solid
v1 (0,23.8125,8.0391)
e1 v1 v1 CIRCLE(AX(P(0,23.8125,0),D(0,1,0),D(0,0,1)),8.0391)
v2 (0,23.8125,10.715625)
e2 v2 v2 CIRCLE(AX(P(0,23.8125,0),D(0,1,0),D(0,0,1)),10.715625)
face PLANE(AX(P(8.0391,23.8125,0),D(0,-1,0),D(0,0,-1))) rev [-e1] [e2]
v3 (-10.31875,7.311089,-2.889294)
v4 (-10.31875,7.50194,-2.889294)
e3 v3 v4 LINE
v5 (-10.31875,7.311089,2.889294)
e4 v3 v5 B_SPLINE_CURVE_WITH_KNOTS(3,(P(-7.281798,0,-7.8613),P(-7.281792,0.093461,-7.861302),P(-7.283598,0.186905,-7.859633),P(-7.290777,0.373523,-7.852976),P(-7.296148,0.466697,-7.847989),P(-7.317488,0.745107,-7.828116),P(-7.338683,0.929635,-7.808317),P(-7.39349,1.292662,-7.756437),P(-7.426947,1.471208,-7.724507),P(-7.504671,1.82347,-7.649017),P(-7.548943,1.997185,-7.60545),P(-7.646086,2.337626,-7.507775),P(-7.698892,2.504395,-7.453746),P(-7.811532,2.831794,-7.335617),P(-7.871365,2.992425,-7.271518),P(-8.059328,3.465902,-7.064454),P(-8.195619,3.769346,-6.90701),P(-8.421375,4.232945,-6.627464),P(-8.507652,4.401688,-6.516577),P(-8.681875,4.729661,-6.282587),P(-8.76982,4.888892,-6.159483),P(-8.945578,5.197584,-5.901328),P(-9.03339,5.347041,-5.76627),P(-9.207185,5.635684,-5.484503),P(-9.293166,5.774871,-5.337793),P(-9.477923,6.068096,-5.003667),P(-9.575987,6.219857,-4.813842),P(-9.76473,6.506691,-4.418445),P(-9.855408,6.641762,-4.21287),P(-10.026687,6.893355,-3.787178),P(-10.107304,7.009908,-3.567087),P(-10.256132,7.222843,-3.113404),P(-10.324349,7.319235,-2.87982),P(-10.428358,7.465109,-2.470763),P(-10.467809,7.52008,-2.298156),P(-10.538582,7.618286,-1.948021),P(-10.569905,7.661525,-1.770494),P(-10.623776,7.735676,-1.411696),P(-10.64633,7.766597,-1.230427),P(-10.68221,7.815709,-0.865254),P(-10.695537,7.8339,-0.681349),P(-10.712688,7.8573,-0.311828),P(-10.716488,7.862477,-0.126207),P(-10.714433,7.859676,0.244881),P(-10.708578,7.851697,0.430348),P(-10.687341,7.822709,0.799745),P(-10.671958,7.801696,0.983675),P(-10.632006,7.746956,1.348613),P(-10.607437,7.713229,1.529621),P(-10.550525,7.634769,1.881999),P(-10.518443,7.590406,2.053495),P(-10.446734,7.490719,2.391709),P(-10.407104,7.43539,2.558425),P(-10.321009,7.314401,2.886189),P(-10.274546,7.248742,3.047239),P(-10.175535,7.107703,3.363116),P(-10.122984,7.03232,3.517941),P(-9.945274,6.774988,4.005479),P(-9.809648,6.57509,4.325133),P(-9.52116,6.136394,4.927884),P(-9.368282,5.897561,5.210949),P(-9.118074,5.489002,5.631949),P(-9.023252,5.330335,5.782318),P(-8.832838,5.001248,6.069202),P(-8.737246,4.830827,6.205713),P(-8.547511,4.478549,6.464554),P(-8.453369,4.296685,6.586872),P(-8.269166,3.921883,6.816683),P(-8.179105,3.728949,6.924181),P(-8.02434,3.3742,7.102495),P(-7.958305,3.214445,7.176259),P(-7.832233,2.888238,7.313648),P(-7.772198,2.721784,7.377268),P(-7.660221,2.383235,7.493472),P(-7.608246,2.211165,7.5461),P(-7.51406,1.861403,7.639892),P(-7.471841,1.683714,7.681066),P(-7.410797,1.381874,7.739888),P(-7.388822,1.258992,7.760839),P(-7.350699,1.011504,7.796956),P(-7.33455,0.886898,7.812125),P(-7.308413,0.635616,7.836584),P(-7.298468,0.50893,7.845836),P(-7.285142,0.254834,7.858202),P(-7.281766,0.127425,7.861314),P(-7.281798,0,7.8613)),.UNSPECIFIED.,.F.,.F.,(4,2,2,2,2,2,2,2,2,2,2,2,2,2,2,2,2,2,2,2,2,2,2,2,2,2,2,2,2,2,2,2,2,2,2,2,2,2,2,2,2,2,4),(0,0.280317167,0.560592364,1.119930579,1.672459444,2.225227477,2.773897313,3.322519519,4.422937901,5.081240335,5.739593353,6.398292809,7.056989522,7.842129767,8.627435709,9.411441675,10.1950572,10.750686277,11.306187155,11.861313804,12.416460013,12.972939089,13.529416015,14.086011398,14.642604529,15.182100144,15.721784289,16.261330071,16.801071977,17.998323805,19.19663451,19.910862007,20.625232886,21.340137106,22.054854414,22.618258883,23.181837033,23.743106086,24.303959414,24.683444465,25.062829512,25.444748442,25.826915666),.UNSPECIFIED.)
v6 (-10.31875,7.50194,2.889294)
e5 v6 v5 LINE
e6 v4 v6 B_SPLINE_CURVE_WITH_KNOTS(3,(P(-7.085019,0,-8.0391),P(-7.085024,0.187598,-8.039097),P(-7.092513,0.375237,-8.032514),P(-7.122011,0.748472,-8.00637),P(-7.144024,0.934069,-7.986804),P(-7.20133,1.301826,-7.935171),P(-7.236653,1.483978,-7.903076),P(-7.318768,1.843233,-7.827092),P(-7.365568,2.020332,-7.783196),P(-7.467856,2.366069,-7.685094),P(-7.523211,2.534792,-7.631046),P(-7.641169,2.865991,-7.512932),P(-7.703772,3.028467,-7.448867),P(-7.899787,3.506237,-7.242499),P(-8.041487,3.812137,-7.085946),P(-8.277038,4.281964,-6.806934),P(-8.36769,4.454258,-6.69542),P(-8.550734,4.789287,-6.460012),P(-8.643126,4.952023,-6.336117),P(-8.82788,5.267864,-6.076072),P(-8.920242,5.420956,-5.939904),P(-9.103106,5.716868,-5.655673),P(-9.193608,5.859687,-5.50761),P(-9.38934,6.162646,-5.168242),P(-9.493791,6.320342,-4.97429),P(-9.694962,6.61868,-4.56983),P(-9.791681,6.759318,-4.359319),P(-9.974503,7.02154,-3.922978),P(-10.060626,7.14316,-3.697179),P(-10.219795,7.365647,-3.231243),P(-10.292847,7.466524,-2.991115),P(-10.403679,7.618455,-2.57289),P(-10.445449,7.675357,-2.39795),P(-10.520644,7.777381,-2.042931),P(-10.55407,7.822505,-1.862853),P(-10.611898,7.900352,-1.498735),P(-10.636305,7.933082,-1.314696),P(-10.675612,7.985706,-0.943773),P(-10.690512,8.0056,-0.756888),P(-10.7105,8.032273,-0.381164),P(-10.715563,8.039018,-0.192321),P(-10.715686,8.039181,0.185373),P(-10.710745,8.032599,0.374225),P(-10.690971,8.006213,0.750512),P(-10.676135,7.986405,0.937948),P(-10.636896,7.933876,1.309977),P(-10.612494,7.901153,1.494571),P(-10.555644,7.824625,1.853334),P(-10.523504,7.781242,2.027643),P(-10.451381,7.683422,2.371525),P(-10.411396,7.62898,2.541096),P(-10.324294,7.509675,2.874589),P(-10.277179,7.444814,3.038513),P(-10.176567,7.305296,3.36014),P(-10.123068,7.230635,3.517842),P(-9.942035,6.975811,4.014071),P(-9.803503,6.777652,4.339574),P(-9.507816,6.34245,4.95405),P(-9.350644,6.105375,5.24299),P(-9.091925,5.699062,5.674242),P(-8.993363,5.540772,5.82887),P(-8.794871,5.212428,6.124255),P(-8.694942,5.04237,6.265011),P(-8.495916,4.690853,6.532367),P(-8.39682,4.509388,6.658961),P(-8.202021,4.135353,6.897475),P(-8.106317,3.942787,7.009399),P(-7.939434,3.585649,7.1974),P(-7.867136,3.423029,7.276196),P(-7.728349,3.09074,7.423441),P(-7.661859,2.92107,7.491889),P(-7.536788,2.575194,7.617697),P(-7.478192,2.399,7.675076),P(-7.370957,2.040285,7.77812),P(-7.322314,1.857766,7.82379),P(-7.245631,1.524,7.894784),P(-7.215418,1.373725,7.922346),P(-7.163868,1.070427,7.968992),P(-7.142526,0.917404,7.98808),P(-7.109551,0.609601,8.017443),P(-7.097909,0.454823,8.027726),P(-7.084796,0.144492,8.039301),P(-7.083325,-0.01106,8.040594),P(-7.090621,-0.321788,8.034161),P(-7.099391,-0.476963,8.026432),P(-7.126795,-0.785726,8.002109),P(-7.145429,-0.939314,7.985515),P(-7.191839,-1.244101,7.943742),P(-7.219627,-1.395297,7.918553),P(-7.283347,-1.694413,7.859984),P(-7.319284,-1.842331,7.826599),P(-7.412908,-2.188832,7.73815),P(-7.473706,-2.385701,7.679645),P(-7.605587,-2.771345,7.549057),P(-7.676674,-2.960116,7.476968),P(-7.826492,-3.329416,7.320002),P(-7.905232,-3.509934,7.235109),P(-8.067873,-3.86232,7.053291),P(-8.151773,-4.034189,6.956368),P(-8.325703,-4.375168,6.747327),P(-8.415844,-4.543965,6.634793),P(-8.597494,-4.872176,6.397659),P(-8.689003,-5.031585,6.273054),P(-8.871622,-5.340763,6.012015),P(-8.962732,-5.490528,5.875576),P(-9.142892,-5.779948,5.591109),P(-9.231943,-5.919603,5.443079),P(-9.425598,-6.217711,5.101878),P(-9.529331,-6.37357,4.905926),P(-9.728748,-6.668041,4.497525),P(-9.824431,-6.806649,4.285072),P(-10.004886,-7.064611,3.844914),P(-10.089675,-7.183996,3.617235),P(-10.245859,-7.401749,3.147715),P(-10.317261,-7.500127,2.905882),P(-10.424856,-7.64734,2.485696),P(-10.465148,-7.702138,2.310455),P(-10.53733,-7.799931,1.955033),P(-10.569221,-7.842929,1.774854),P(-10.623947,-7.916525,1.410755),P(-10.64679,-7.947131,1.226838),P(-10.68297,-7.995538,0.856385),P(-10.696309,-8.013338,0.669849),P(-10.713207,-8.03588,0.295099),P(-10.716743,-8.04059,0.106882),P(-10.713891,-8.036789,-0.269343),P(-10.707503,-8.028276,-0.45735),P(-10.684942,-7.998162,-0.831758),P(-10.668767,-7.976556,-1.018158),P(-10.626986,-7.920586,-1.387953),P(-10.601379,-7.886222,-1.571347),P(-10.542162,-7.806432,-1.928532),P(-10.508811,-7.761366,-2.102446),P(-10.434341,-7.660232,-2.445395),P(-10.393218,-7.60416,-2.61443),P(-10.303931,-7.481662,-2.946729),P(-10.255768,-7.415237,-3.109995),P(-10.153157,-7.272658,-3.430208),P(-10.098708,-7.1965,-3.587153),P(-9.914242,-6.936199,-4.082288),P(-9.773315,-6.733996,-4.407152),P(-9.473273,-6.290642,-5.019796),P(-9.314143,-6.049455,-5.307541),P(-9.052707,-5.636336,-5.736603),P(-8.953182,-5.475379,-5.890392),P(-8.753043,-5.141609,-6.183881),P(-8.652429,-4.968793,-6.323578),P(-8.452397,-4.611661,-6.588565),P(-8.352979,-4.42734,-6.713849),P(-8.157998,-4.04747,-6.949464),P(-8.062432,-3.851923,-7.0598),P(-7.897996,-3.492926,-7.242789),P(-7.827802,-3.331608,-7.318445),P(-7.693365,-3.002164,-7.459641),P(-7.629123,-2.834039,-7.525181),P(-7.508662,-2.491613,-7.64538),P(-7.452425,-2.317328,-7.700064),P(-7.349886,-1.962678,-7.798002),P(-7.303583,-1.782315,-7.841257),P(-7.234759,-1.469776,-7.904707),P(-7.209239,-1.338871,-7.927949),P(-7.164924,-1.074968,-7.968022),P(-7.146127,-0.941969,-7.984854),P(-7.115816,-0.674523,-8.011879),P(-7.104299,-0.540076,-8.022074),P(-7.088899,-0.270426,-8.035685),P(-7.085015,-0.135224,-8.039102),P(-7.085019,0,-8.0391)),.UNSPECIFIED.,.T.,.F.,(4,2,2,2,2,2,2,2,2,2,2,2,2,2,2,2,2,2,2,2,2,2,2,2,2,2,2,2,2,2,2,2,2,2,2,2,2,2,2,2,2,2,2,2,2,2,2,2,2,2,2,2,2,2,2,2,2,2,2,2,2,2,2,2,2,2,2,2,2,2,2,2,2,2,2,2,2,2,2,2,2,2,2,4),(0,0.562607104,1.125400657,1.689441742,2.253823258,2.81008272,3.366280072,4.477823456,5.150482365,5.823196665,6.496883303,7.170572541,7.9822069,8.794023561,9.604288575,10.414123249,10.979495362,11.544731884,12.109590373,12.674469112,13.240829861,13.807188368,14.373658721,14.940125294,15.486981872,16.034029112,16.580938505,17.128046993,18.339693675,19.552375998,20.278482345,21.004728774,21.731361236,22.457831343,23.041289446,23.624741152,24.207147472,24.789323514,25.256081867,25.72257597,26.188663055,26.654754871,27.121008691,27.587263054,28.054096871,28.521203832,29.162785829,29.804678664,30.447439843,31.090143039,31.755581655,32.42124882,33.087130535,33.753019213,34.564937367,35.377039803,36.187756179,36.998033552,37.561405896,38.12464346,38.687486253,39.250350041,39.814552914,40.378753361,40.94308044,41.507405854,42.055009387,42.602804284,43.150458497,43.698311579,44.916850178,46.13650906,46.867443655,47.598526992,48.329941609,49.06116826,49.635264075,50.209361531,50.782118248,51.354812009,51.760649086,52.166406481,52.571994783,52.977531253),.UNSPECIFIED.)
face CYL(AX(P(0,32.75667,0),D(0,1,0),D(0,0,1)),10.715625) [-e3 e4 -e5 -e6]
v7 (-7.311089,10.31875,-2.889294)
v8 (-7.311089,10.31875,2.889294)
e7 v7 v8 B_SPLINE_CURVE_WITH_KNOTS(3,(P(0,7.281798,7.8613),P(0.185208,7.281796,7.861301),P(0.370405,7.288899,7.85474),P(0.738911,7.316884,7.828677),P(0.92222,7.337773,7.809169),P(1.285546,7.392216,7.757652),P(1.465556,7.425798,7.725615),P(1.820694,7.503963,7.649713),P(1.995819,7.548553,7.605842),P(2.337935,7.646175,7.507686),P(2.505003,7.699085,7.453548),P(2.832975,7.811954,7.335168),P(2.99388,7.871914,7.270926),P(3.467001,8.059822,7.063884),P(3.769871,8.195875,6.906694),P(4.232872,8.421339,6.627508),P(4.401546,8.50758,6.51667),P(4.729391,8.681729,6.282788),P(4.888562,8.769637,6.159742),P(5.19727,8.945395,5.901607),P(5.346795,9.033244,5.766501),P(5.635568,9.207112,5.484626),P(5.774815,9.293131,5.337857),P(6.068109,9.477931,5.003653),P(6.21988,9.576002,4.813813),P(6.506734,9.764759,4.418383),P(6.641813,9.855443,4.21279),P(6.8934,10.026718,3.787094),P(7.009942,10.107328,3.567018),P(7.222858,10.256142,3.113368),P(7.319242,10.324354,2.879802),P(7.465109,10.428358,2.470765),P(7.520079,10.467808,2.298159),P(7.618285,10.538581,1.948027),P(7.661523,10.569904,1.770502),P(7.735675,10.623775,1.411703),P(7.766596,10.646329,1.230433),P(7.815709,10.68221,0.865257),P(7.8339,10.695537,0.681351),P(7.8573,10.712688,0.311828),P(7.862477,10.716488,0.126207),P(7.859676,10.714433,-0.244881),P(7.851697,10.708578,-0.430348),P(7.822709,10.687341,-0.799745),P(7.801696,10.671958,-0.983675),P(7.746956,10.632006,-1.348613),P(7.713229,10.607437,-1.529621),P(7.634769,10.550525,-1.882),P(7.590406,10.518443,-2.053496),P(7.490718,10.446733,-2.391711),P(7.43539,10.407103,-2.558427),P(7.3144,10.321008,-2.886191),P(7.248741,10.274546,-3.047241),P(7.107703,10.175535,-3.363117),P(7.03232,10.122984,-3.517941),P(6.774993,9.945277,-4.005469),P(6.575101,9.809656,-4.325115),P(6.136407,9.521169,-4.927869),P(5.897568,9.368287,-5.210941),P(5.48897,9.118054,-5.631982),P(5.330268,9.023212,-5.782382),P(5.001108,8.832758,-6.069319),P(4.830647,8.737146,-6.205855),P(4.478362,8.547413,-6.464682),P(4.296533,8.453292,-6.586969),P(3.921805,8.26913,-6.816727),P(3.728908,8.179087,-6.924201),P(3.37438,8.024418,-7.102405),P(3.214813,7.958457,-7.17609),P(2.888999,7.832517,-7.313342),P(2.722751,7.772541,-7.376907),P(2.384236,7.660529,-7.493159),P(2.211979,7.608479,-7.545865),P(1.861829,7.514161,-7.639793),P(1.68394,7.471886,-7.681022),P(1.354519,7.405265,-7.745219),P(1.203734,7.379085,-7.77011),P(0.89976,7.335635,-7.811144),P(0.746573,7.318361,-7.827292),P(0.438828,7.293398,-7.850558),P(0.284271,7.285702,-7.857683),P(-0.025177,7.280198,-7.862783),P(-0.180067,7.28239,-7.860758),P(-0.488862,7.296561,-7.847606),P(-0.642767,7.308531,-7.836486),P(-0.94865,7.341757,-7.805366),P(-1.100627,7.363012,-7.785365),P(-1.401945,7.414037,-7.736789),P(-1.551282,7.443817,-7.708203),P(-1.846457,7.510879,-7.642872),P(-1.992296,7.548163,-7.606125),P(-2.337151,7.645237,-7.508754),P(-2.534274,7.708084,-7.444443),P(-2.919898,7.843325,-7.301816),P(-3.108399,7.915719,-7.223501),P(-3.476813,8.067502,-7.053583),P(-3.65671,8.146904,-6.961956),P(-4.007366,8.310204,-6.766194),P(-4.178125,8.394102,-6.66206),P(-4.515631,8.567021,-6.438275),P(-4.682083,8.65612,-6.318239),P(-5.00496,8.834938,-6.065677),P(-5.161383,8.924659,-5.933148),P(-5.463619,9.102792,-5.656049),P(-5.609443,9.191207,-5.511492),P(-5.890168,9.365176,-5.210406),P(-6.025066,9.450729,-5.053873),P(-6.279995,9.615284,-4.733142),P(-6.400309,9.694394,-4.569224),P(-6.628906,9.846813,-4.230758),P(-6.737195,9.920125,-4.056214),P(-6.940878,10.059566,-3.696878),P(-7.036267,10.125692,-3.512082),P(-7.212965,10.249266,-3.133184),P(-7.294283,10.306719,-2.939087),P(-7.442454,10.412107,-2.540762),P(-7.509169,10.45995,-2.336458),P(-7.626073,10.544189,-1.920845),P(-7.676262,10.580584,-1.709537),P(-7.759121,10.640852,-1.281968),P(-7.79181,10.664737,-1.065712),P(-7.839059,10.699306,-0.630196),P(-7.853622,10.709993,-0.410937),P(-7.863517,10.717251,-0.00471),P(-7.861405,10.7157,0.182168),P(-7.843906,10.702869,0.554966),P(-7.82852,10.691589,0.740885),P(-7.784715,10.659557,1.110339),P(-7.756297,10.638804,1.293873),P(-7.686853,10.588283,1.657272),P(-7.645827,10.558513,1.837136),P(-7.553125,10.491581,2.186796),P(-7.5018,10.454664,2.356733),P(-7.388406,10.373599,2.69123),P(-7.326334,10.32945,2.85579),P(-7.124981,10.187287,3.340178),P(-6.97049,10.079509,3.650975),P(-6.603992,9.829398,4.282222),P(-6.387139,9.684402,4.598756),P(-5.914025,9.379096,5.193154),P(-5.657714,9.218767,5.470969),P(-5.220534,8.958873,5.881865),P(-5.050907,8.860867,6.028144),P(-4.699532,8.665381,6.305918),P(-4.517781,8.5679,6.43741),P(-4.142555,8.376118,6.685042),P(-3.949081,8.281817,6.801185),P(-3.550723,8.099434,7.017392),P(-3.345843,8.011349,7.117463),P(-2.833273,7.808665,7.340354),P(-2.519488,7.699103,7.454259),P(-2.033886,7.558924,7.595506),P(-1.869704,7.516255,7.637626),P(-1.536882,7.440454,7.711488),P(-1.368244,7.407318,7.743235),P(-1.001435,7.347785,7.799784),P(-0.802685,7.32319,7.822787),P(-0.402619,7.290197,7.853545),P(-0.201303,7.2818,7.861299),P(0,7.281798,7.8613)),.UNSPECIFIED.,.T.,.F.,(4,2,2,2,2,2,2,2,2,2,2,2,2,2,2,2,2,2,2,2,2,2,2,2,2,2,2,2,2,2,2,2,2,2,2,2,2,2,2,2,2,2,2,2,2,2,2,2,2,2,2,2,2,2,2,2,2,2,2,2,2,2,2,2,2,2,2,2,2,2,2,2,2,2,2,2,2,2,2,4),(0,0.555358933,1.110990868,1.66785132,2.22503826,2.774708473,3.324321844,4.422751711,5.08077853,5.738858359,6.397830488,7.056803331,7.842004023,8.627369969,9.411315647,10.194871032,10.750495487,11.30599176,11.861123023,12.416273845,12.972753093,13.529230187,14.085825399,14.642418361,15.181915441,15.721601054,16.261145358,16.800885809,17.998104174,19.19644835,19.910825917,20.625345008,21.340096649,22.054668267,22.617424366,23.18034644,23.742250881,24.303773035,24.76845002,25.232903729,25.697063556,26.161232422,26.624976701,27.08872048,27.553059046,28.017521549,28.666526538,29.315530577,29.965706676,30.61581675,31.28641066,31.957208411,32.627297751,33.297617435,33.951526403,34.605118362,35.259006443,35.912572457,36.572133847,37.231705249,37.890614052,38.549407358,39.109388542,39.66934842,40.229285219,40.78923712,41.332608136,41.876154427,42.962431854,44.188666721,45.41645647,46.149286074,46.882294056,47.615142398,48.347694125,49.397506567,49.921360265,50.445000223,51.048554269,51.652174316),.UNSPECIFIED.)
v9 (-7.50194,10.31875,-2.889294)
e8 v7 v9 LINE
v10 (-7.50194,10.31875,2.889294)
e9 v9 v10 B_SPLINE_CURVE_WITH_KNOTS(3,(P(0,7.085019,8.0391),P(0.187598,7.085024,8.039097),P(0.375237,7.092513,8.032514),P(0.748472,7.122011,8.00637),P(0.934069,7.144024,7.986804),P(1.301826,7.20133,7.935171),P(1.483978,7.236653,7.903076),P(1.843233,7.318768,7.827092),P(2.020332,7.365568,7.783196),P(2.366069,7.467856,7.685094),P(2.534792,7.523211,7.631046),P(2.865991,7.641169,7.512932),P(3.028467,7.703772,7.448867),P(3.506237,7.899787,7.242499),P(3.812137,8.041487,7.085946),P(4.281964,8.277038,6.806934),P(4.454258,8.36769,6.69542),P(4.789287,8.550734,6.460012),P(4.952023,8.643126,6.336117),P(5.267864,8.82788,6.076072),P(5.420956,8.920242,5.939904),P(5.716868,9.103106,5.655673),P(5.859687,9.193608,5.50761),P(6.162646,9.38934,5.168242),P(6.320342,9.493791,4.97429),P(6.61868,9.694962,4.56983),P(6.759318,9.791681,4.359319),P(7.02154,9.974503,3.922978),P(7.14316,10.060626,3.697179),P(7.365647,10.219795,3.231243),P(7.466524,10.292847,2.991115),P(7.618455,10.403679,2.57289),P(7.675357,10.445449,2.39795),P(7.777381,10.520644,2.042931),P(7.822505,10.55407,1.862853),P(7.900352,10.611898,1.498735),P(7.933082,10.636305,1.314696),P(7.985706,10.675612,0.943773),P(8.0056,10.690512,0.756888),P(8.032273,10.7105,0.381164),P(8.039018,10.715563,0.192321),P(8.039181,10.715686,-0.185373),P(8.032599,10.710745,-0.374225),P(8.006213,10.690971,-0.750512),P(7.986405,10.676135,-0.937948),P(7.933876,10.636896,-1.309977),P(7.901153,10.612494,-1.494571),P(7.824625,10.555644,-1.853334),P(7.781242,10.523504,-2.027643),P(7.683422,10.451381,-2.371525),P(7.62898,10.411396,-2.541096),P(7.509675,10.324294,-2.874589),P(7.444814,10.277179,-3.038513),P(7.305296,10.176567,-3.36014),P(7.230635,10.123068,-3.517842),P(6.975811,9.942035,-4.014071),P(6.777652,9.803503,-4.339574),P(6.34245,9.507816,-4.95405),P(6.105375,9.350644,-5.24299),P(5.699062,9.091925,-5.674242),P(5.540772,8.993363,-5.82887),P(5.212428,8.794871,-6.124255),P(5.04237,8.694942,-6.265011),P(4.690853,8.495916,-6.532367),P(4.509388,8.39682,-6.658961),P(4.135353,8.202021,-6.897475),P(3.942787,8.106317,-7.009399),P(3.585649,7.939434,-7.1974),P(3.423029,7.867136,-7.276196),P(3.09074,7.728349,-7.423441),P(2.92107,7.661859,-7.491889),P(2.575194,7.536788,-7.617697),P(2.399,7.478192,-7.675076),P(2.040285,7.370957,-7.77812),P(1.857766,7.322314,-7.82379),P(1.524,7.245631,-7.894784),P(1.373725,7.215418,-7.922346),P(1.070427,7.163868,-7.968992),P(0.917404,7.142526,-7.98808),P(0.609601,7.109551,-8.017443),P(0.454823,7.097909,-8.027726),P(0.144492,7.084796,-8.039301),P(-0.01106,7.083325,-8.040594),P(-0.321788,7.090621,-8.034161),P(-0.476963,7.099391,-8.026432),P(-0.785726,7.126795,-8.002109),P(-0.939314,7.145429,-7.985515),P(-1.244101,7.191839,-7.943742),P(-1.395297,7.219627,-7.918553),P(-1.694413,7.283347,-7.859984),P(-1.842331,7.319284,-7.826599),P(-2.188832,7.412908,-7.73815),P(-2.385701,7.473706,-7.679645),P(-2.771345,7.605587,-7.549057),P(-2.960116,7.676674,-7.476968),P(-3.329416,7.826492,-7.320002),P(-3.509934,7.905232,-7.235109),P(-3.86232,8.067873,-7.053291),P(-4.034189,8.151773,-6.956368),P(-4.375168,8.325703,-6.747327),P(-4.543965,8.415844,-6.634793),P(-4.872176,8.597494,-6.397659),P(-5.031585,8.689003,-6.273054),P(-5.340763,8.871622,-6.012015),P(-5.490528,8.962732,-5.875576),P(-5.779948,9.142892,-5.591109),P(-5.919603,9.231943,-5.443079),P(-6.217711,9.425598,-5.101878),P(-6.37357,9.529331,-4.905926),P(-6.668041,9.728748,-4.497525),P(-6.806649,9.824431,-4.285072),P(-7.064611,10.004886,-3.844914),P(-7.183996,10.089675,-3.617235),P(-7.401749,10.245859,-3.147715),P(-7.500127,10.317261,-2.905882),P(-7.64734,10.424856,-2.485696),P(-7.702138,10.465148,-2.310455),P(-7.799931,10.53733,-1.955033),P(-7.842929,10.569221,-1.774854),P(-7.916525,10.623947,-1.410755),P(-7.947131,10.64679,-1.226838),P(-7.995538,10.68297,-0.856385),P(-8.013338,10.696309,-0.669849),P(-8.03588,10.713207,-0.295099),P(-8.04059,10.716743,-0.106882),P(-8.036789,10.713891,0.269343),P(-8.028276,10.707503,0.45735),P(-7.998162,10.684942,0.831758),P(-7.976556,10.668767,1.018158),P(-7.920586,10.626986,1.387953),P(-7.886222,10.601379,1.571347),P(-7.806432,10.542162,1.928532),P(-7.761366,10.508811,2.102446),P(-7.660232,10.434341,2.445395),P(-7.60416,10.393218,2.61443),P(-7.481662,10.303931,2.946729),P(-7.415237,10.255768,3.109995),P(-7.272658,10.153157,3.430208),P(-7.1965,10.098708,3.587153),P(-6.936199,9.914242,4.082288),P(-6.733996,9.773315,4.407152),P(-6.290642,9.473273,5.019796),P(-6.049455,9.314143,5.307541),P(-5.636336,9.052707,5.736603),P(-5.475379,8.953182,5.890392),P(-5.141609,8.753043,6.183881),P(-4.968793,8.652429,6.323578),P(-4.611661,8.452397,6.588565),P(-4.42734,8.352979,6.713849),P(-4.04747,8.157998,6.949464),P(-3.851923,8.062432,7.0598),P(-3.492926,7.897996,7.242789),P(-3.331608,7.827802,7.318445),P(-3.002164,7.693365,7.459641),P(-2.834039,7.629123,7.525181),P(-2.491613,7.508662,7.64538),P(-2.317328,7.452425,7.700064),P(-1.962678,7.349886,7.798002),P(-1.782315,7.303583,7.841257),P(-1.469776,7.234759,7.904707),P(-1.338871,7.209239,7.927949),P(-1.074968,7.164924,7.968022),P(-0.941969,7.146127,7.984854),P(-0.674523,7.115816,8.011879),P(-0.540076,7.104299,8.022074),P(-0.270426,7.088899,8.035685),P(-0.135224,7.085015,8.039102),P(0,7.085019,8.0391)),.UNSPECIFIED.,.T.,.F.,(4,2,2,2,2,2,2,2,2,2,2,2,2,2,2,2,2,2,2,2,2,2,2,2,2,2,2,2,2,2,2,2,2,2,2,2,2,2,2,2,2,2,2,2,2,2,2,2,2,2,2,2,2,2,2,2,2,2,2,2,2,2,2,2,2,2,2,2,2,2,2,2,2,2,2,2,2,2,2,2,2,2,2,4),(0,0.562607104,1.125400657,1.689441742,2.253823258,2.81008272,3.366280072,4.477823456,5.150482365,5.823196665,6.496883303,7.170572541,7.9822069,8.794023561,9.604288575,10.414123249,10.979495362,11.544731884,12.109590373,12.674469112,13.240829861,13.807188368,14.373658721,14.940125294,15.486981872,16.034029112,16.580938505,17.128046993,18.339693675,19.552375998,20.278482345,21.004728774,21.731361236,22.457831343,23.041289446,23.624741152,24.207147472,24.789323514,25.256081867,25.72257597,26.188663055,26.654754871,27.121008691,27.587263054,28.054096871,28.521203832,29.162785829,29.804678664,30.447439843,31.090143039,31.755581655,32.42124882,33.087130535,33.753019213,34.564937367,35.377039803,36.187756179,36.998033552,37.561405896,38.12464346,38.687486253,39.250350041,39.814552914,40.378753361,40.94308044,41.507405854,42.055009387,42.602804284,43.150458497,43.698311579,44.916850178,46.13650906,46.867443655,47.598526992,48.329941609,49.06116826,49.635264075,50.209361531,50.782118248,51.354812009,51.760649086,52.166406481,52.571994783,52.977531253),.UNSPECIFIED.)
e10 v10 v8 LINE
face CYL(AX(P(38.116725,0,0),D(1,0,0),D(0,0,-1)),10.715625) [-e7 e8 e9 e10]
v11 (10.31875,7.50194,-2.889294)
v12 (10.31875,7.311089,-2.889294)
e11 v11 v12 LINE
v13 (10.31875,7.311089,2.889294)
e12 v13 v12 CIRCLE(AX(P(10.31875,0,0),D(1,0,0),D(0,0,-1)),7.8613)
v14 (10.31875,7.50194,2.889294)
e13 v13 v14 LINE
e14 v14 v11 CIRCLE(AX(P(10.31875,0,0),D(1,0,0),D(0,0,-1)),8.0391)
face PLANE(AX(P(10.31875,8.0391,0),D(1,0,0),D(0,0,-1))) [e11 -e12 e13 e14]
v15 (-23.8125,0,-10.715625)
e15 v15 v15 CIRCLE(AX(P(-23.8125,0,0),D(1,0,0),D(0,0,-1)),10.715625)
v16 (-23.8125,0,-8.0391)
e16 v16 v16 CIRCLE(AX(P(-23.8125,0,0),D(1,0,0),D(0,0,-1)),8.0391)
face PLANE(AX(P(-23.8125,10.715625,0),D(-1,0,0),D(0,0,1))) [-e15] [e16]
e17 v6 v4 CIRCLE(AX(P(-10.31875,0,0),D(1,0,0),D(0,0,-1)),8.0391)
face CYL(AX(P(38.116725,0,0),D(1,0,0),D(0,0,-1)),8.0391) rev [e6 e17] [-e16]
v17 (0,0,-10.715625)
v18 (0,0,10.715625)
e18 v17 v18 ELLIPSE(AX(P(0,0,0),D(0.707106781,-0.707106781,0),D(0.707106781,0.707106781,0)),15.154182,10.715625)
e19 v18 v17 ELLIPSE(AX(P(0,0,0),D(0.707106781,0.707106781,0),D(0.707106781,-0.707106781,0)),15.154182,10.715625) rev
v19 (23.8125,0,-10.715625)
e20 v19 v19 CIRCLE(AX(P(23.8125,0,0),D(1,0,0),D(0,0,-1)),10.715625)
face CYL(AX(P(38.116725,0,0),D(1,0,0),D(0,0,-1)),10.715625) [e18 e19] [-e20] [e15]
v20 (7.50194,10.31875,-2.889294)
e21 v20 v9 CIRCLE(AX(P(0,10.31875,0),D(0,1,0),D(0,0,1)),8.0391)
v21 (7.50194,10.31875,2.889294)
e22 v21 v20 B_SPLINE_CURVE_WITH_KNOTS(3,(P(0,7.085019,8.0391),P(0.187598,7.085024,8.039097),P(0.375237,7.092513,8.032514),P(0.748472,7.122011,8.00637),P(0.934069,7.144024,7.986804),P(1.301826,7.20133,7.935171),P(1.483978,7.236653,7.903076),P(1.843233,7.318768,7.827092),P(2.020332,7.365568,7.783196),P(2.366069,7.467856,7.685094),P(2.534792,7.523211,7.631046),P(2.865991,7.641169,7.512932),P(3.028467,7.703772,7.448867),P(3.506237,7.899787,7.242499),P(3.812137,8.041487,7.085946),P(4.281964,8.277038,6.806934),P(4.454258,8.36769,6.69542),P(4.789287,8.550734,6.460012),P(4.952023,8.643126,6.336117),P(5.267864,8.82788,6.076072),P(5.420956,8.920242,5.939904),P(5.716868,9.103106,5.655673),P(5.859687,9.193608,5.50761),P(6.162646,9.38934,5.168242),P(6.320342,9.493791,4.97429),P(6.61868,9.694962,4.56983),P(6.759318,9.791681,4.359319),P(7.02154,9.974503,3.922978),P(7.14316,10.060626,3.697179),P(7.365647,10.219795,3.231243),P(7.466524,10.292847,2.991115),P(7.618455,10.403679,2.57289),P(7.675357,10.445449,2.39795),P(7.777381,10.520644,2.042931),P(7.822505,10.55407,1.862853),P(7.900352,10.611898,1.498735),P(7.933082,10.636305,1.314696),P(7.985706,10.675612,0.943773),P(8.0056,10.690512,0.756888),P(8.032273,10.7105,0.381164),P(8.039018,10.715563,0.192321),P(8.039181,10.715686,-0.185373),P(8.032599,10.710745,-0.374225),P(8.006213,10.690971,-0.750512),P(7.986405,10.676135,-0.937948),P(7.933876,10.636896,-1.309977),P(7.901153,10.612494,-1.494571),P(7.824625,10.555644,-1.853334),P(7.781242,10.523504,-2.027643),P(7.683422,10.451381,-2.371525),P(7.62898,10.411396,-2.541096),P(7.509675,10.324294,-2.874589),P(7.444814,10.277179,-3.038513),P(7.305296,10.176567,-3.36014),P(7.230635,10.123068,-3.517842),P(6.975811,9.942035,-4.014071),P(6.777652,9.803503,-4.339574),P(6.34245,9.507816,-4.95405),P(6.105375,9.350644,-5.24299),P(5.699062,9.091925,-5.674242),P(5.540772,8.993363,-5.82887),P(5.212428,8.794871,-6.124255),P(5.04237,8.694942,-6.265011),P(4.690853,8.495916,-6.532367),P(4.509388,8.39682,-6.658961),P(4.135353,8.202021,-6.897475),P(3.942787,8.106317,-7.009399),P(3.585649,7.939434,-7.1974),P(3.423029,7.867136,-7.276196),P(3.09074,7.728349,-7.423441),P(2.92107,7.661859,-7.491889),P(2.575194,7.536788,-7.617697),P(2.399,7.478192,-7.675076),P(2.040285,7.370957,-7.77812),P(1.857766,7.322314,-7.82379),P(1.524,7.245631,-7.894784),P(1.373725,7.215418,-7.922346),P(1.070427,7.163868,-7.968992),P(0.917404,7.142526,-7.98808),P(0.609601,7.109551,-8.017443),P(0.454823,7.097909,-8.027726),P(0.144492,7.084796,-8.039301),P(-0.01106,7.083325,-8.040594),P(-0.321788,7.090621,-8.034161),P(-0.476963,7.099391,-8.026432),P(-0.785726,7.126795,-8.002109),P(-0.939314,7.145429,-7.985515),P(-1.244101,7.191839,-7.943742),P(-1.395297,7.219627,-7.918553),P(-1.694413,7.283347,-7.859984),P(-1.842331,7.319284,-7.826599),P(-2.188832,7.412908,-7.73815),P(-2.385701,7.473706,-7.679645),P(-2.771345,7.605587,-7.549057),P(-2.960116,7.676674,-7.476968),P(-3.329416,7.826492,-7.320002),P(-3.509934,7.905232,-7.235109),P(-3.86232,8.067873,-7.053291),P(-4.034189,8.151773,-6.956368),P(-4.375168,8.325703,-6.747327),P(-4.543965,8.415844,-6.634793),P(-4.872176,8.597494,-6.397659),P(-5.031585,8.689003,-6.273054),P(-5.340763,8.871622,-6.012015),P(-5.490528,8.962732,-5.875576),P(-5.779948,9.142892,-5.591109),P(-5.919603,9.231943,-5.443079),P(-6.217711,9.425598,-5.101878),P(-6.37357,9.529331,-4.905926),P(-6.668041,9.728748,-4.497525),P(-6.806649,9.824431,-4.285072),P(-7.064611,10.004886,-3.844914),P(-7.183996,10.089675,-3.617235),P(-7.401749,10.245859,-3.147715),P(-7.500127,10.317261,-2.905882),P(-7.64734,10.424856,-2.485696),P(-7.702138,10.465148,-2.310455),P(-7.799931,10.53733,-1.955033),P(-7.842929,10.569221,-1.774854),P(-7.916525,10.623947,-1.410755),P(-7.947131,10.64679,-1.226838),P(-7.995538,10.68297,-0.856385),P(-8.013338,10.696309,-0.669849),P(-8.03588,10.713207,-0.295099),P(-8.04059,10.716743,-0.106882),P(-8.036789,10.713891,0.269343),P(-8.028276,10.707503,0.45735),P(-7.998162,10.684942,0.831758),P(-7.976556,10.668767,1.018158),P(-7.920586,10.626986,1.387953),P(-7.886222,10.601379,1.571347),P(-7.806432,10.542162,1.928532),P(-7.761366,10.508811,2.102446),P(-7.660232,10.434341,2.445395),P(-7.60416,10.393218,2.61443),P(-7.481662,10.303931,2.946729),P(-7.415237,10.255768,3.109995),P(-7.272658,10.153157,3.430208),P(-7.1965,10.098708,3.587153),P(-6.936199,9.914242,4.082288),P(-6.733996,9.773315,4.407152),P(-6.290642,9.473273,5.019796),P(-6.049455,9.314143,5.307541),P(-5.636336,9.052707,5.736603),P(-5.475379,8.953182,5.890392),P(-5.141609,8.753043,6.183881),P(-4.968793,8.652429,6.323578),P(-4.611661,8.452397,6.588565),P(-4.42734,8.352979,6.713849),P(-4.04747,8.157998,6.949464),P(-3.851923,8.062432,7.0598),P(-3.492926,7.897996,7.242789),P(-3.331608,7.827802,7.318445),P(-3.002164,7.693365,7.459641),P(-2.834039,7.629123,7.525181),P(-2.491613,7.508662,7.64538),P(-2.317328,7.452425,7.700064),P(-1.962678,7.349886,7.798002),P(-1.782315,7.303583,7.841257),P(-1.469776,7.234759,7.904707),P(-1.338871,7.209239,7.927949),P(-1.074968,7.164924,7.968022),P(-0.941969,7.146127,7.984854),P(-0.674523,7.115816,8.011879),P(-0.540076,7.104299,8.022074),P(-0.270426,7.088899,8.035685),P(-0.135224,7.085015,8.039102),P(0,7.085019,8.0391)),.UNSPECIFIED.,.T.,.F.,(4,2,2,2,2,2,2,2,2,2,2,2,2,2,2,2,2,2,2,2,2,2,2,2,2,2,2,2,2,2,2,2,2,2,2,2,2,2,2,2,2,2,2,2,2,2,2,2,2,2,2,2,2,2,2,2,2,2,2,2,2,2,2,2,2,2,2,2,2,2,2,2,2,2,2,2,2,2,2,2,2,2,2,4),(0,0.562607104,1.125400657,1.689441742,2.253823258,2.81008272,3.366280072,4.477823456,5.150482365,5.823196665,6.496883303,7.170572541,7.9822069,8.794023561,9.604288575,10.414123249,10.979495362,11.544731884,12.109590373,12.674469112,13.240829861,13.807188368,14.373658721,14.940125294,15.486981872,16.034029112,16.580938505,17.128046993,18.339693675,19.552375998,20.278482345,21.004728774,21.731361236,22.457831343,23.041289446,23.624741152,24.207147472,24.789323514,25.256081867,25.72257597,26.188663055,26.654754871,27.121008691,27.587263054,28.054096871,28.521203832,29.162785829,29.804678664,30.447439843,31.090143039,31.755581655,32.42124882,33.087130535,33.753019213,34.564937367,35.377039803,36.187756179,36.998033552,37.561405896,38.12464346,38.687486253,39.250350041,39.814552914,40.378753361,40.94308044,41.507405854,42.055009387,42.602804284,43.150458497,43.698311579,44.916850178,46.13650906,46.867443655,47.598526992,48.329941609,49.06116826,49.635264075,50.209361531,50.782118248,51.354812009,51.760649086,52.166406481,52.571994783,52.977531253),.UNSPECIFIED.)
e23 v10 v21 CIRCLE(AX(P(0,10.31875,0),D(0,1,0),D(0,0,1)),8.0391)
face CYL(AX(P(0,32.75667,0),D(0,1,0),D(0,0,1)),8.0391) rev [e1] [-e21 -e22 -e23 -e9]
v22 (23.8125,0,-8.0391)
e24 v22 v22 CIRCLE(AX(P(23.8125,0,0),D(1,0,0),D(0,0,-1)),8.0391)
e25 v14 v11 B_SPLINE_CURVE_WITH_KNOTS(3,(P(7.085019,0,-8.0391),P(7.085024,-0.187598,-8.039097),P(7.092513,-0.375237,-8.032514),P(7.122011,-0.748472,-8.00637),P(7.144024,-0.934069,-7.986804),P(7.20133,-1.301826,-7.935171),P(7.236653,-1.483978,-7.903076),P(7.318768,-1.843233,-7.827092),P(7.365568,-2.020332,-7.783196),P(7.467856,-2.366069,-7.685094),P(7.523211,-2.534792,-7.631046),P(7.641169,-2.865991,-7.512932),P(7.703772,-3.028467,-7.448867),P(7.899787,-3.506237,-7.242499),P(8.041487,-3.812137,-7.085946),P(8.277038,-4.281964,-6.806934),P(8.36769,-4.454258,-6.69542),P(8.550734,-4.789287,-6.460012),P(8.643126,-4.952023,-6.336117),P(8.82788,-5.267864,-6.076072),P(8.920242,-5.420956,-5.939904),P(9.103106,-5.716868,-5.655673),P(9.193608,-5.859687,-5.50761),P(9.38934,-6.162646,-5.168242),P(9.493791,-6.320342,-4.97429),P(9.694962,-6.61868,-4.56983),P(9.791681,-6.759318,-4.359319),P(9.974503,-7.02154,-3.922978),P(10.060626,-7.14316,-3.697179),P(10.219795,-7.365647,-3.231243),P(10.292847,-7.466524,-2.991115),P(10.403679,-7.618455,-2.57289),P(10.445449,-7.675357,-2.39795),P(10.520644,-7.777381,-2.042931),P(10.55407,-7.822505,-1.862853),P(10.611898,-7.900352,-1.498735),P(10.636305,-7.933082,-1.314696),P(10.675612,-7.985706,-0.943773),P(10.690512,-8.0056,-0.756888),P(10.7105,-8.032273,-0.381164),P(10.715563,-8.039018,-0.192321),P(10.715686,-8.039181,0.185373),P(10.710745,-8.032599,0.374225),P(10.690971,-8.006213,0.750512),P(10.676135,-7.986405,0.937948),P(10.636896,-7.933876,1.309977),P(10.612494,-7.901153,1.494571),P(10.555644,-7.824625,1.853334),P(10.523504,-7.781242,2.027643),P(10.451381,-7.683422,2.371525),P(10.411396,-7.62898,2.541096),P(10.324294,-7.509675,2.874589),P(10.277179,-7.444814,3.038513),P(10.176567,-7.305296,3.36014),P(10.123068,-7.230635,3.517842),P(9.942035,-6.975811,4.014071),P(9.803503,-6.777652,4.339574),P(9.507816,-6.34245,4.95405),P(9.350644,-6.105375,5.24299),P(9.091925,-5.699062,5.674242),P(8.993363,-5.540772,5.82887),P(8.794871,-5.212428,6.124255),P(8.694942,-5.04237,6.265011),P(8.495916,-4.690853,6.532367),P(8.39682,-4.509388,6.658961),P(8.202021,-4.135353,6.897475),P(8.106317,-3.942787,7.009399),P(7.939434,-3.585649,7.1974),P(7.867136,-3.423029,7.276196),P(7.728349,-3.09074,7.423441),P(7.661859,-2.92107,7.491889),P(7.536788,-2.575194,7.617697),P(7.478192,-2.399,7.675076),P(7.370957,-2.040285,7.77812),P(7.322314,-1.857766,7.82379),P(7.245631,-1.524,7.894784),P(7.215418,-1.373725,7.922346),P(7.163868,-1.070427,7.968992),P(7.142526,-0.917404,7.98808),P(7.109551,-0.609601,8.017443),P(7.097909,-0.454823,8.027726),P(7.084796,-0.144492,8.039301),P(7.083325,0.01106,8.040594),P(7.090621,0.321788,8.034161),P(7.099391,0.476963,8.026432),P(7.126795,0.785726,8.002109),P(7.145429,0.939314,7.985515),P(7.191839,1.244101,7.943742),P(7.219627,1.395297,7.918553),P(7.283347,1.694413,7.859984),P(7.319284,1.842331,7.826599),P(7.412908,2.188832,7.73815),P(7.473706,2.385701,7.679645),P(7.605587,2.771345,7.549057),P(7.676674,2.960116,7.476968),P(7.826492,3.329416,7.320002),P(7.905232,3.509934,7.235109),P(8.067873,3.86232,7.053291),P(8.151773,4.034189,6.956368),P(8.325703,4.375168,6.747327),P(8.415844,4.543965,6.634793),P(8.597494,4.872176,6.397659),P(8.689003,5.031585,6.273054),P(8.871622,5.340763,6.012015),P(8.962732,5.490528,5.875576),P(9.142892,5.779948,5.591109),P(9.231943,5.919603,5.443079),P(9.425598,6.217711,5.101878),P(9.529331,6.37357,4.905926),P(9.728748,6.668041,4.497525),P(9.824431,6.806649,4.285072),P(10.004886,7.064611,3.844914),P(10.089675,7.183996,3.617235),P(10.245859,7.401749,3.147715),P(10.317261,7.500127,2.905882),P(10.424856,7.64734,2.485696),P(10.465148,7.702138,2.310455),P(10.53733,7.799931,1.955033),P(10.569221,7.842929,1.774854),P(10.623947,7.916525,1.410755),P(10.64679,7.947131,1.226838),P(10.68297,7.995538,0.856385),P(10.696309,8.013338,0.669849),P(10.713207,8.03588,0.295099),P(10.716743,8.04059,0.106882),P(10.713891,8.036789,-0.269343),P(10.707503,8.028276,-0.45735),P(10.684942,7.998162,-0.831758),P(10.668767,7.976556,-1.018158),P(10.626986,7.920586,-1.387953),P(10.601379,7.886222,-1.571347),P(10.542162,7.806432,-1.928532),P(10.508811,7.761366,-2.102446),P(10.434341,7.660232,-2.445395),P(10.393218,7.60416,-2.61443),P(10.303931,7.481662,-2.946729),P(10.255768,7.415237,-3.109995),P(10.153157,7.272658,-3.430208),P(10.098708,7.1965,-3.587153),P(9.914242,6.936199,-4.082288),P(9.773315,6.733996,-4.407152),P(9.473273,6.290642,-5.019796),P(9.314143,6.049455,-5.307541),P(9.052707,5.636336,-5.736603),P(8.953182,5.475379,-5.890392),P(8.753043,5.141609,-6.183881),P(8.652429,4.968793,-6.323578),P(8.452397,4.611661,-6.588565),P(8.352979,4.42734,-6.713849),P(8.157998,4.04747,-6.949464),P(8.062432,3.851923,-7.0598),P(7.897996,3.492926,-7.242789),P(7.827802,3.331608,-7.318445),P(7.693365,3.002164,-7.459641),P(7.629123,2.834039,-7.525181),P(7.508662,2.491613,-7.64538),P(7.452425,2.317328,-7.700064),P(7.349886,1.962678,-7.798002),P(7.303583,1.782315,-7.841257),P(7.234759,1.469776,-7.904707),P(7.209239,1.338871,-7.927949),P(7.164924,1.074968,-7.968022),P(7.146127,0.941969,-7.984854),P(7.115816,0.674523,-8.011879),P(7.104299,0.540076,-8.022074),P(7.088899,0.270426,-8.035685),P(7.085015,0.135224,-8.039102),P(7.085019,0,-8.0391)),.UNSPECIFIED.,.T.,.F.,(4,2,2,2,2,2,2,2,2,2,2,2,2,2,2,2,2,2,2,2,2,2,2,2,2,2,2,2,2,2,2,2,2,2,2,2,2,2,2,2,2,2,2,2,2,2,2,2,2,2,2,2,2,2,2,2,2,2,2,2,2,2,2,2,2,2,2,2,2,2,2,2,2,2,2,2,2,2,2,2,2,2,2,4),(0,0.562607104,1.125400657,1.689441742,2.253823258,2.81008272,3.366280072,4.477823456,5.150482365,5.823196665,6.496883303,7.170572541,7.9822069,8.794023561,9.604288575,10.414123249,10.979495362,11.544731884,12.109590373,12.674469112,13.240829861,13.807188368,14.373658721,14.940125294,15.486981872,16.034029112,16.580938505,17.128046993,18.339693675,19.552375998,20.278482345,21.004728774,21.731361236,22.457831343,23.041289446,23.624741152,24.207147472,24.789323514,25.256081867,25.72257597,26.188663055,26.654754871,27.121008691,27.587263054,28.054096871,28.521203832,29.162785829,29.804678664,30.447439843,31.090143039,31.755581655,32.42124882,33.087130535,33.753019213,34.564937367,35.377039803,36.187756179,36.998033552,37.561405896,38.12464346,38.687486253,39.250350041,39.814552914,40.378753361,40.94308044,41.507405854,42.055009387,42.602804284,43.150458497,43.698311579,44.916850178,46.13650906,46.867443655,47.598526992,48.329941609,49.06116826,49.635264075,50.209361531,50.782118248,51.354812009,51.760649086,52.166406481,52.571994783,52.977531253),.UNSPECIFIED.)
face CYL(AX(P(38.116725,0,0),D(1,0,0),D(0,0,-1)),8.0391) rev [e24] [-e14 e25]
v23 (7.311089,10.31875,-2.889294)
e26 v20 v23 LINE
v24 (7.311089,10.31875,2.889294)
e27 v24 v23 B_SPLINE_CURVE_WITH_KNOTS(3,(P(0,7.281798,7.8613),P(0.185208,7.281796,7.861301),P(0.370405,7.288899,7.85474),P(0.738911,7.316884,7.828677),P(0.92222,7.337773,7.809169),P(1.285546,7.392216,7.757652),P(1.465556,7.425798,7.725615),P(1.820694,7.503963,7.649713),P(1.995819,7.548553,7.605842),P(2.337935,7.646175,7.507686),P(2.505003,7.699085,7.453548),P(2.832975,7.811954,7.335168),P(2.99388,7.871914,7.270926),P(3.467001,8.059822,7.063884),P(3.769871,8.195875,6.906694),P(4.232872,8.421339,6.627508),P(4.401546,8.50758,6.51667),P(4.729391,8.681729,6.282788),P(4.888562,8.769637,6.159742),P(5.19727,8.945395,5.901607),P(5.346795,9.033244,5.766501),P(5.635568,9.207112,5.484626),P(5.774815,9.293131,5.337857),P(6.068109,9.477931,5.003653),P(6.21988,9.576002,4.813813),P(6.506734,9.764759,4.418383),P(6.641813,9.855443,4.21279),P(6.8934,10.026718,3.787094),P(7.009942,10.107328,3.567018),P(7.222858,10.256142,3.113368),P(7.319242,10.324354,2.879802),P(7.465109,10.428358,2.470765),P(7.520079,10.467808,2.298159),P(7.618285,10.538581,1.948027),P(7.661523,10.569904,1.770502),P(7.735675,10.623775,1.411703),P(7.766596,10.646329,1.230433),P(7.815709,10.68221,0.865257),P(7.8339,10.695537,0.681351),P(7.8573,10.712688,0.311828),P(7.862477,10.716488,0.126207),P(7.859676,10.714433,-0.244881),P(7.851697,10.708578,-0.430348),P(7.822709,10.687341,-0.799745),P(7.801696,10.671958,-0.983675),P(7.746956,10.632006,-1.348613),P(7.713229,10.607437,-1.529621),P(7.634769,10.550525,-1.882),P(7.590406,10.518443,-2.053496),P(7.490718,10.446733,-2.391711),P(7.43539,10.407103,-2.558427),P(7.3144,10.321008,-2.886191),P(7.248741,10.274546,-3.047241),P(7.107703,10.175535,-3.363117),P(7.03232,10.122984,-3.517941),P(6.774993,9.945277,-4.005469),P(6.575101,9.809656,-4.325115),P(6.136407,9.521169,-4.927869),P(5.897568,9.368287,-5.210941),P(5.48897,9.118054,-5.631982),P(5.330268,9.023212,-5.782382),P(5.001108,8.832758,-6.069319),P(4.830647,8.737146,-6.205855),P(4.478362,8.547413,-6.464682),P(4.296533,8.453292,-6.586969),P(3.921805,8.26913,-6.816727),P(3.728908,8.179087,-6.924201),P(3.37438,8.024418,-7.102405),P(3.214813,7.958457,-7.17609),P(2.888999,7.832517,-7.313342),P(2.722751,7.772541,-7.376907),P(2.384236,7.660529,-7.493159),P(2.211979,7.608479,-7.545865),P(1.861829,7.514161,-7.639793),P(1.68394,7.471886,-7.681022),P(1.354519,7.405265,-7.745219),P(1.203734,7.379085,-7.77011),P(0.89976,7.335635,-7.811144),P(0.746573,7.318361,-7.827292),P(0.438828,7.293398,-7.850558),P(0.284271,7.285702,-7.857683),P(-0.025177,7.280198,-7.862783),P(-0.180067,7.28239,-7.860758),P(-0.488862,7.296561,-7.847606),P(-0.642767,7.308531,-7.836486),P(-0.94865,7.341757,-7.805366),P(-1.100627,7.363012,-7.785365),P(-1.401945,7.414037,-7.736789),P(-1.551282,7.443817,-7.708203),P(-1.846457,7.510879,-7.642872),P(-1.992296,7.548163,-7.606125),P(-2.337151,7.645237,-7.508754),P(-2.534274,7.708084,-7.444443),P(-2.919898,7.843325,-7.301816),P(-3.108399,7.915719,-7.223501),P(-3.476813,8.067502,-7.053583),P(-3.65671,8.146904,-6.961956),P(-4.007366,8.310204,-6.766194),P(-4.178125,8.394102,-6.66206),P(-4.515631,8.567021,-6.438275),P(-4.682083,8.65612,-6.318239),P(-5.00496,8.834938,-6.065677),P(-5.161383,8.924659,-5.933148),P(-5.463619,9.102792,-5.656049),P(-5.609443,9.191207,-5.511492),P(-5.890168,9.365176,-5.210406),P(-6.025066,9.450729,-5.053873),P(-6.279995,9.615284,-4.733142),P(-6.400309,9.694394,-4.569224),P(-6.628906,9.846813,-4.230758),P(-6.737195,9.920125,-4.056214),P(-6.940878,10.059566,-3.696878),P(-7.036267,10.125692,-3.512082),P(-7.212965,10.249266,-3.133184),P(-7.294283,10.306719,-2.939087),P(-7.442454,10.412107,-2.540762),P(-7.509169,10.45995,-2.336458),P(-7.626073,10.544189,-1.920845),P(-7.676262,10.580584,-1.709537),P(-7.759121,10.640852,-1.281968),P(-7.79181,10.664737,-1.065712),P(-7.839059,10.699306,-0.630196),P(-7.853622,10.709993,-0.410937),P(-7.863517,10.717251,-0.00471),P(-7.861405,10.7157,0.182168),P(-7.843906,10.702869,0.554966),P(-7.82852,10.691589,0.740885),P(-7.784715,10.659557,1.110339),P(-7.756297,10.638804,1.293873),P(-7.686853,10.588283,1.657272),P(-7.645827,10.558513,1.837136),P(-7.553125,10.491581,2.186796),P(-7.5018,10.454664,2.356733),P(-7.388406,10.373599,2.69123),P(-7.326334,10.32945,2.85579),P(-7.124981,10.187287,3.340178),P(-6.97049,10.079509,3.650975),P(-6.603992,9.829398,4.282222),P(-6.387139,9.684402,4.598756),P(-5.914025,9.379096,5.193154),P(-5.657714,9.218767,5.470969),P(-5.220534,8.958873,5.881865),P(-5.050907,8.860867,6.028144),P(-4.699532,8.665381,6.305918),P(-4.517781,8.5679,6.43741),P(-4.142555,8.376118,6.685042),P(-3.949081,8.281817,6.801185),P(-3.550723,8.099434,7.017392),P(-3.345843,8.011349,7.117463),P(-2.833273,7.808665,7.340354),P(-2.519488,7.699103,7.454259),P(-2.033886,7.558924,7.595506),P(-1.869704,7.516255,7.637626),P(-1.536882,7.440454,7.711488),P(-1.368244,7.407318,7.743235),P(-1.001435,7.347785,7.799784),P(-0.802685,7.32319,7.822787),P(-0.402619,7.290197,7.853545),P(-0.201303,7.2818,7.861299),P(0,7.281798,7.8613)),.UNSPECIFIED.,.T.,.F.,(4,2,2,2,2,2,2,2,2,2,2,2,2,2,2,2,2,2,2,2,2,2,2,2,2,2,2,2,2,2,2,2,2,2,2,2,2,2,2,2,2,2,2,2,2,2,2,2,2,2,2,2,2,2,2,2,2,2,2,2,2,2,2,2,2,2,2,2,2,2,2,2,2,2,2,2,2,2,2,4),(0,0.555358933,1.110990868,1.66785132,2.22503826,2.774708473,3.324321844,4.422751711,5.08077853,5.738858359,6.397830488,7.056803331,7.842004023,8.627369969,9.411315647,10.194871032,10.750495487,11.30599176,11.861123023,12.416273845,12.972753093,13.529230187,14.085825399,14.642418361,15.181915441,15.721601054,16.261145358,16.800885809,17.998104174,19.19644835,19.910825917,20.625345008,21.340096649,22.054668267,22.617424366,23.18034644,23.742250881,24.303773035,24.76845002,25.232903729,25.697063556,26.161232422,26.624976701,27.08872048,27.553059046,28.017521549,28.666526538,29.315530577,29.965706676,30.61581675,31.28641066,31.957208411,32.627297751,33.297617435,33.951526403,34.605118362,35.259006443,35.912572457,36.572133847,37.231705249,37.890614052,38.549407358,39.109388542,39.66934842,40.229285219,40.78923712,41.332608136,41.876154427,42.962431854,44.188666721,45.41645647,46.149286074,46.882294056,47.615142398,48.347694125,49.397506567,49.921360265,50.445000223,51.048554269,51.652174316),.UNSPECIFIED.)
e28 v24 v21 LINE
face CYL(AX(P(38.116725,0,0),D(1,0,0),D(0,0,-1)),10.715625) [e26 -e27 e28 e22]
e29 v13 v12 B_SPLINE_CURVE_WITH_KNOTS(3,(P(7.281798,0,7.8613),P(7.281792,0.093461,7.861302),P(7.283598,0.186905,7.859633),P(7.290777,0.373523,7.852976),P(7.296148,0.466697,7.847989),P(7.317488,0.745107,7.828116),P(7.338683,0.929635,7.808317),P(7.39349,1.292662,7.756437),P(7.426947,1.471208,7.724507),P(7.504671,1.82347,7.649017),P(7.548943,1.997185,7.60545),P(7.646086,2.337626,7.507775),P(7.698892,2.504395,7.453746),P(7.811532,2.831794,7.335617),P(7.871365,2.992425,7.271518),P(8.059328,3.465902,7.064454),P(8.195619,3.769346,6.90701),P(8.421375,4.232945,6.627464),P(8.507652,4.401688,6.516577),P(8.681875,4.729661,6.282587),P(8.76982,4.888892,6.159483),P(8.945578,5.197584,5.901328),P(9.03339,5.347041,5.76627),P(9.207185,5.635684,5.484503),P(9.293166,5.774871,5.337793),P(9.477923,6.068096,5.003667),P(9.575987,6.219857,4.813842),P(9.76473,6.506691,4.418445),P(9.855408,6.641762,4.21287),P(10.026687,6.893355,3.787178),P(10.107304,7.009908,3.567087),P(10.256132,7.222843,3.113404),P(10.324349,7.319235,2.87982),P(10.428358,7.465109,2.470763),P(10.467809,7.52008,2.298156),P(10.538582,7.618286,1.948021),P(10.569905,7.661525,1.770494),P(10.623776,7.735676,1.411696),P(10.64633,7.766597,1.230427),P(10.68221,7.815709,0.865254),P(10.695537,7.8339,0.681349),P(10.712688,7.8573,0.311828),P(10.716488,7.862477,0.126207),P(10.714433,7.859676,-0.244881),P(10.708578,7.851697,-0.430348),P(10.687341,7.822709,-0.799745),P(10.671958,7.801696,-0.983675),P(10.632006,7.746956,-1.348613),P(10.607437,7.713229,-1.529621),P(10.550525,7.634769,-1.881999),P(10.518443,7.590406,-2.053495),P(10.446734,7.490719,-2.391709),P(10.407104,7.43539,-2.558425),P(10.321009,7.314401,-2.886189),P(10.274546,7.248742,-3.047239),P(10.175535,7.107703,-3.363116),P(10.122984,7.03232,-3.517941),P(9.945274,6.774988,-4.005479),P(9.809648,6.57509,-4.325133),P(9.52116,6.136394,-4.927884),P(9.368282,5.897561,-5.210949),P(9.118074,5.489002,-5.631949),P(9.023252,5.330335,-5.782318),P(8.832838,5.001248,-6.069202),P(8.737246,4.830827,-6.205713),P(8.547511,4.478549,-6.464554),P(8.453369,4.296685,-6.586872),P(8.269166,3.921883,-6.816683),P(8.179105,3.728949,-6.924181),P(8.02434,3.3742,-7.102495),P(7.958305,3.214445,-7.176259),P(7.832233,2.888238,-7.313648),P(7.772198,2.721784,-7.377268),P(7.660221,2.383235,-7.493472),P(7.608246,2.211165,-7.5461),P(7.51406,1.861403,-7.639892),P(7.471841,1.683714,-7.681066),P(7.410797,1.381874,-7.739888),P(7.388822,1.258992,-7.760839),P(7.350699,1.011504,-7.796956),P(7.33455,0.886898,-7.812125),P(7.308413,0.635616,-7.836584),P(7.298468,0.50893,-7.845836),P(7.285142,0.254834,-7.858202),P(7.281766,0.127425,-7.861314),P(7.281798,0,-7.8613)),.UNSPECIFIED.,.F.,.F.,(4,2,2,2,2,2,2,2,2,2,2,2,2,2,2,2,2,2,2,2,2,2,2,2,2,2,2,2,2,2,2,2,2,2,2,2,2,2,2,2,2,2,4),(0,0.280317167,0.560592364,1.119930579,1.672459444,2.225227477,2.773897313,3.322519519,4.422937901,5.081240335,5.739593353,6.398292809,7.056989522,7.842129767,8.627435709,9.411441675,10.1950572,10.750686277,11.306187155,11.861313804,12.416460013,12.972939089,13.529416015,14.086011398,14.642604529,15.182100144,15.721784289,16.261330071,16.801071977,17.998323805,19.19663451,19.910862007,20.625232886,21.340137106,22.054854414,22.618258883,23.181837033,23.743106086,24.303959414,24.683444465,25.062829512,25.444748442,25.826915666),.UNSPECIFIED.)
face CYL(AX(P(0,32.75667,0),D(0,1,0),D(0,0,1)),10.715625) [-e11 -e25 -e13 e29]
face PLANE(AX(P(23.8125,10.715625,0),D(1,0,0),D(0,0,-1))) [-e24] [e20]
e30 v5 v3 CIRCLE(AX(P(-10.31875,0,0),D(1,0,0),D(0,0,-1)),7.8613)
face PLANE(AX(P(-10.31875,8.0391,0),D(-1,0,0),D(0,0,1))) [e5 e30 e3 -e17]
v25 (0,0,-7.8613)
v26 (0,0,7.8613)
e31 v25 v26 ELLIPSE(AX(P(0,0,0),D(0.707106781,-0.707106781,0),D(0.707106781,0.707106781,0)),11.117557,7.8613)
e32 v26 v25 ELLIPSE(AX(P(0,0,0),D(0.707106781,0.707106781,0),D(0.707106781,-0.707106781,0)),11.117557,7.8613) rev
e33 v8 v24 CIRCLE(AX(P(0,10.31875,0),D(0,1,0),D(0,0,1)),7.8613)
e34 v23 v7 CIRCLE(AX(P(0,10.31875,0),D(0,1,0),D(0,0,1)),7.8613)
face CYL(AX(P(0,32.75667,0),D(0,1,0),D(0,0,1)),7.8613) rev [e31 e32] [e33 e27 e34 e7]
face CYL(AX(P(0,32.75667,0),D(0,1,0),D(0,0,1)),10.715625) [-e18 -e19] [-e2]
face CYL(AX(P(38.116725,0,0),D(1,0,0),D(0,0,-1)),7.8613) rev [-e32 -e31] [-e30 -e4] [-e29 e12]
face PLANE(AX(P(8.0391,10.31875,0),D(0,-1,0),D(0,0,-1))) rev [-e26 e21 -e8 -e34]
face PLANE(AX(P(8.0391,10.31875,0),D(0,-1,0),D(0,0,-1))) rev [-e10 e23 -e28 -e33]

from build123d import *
from build123d.topology import SkipClean

# Parameters (mm, degrees)
SKETCH4_R              = 7.8613
CUT_EXTRUDE1_DEPTH     = 50.165
CUT_EXTRUDE2_OUTLINE_W = 7.8613
CUT_EXTRUDE2_OUTLINE_H = 10.71591219


# Read off the part's stored shape, not the designer's step: Cut-Extrude2
with BuildPart() as part:
    # Sketch1 → Revolve1 (revolve)
    with BuildSketch(Plane.XY, mode=Mode.PRIVATE) as revolve1_sk:
        Polygon((-23.8125, 10.715625), (23.8125, 10.715625), (23.8125, 8.0391), (10.31875, 8.0391), (10.31875, 7.8613), (-10.31875, 7.8613), (-10.31875, 8.0391), (-23.8125, 8.0391), align=None)
    revolve(revolve1_sk.sketch.rotate(Axis((38.116724739, 0, 0), (-1, 0, 0)), 90), axis=Axis((38.116724739, 0, 0), (-1, 0, 0)))

    # Sketch3 → Revolve2 (revolve)
    with BuildSketch(Plane.XY, mode=Mode.PRIVATE) as revolve2_sk:
        Polygon((8.0391, 23.8125), (10.715625, 23.8125), (10.715625, 0), (7.8613, 0), (7.8613, 10.31875), (8.0391, 10.31875), align=None)
    revolve(revolve2_sk.sketch.rotate(Axis((0, 32.756669959, 0), (0, -1, 0)), 90), axis=Axis((0, 32.756669959, 0), (0, -1, 0)))

    # Sketch4 → Cut-Extrude1 (cut)
    with BuildSketch(Plane.ZY.offset(26.3525)):
        with Locations(Location((0, 0, 0), (0, 0, 68.436398303))):
            Circle(SKETCH4_R)
    extrude(amount=-CUT_EXTRUDE1_DEPTH, mode=Mode.SUBTRACT)

    # Cut-Extrude2 outline → Cut-Extrude2 (revolve, cut)
    with SkipClean():  # the faces are left unmerged after this step: merging them gives an invalid solid
        with BuildSketch(Plane.XY):
            with Locations((3.93065, 5.357956095)):
                Rectangle(CUT_EXTRUDE2_OUTLINE_W, CUT_EXTRUDE2_OUTLINE_H)
        revolve(axis=Axis((0, 0, 0), (0, 1, 0)), mode=Mode.SUBTRACT)


solid = part.part
